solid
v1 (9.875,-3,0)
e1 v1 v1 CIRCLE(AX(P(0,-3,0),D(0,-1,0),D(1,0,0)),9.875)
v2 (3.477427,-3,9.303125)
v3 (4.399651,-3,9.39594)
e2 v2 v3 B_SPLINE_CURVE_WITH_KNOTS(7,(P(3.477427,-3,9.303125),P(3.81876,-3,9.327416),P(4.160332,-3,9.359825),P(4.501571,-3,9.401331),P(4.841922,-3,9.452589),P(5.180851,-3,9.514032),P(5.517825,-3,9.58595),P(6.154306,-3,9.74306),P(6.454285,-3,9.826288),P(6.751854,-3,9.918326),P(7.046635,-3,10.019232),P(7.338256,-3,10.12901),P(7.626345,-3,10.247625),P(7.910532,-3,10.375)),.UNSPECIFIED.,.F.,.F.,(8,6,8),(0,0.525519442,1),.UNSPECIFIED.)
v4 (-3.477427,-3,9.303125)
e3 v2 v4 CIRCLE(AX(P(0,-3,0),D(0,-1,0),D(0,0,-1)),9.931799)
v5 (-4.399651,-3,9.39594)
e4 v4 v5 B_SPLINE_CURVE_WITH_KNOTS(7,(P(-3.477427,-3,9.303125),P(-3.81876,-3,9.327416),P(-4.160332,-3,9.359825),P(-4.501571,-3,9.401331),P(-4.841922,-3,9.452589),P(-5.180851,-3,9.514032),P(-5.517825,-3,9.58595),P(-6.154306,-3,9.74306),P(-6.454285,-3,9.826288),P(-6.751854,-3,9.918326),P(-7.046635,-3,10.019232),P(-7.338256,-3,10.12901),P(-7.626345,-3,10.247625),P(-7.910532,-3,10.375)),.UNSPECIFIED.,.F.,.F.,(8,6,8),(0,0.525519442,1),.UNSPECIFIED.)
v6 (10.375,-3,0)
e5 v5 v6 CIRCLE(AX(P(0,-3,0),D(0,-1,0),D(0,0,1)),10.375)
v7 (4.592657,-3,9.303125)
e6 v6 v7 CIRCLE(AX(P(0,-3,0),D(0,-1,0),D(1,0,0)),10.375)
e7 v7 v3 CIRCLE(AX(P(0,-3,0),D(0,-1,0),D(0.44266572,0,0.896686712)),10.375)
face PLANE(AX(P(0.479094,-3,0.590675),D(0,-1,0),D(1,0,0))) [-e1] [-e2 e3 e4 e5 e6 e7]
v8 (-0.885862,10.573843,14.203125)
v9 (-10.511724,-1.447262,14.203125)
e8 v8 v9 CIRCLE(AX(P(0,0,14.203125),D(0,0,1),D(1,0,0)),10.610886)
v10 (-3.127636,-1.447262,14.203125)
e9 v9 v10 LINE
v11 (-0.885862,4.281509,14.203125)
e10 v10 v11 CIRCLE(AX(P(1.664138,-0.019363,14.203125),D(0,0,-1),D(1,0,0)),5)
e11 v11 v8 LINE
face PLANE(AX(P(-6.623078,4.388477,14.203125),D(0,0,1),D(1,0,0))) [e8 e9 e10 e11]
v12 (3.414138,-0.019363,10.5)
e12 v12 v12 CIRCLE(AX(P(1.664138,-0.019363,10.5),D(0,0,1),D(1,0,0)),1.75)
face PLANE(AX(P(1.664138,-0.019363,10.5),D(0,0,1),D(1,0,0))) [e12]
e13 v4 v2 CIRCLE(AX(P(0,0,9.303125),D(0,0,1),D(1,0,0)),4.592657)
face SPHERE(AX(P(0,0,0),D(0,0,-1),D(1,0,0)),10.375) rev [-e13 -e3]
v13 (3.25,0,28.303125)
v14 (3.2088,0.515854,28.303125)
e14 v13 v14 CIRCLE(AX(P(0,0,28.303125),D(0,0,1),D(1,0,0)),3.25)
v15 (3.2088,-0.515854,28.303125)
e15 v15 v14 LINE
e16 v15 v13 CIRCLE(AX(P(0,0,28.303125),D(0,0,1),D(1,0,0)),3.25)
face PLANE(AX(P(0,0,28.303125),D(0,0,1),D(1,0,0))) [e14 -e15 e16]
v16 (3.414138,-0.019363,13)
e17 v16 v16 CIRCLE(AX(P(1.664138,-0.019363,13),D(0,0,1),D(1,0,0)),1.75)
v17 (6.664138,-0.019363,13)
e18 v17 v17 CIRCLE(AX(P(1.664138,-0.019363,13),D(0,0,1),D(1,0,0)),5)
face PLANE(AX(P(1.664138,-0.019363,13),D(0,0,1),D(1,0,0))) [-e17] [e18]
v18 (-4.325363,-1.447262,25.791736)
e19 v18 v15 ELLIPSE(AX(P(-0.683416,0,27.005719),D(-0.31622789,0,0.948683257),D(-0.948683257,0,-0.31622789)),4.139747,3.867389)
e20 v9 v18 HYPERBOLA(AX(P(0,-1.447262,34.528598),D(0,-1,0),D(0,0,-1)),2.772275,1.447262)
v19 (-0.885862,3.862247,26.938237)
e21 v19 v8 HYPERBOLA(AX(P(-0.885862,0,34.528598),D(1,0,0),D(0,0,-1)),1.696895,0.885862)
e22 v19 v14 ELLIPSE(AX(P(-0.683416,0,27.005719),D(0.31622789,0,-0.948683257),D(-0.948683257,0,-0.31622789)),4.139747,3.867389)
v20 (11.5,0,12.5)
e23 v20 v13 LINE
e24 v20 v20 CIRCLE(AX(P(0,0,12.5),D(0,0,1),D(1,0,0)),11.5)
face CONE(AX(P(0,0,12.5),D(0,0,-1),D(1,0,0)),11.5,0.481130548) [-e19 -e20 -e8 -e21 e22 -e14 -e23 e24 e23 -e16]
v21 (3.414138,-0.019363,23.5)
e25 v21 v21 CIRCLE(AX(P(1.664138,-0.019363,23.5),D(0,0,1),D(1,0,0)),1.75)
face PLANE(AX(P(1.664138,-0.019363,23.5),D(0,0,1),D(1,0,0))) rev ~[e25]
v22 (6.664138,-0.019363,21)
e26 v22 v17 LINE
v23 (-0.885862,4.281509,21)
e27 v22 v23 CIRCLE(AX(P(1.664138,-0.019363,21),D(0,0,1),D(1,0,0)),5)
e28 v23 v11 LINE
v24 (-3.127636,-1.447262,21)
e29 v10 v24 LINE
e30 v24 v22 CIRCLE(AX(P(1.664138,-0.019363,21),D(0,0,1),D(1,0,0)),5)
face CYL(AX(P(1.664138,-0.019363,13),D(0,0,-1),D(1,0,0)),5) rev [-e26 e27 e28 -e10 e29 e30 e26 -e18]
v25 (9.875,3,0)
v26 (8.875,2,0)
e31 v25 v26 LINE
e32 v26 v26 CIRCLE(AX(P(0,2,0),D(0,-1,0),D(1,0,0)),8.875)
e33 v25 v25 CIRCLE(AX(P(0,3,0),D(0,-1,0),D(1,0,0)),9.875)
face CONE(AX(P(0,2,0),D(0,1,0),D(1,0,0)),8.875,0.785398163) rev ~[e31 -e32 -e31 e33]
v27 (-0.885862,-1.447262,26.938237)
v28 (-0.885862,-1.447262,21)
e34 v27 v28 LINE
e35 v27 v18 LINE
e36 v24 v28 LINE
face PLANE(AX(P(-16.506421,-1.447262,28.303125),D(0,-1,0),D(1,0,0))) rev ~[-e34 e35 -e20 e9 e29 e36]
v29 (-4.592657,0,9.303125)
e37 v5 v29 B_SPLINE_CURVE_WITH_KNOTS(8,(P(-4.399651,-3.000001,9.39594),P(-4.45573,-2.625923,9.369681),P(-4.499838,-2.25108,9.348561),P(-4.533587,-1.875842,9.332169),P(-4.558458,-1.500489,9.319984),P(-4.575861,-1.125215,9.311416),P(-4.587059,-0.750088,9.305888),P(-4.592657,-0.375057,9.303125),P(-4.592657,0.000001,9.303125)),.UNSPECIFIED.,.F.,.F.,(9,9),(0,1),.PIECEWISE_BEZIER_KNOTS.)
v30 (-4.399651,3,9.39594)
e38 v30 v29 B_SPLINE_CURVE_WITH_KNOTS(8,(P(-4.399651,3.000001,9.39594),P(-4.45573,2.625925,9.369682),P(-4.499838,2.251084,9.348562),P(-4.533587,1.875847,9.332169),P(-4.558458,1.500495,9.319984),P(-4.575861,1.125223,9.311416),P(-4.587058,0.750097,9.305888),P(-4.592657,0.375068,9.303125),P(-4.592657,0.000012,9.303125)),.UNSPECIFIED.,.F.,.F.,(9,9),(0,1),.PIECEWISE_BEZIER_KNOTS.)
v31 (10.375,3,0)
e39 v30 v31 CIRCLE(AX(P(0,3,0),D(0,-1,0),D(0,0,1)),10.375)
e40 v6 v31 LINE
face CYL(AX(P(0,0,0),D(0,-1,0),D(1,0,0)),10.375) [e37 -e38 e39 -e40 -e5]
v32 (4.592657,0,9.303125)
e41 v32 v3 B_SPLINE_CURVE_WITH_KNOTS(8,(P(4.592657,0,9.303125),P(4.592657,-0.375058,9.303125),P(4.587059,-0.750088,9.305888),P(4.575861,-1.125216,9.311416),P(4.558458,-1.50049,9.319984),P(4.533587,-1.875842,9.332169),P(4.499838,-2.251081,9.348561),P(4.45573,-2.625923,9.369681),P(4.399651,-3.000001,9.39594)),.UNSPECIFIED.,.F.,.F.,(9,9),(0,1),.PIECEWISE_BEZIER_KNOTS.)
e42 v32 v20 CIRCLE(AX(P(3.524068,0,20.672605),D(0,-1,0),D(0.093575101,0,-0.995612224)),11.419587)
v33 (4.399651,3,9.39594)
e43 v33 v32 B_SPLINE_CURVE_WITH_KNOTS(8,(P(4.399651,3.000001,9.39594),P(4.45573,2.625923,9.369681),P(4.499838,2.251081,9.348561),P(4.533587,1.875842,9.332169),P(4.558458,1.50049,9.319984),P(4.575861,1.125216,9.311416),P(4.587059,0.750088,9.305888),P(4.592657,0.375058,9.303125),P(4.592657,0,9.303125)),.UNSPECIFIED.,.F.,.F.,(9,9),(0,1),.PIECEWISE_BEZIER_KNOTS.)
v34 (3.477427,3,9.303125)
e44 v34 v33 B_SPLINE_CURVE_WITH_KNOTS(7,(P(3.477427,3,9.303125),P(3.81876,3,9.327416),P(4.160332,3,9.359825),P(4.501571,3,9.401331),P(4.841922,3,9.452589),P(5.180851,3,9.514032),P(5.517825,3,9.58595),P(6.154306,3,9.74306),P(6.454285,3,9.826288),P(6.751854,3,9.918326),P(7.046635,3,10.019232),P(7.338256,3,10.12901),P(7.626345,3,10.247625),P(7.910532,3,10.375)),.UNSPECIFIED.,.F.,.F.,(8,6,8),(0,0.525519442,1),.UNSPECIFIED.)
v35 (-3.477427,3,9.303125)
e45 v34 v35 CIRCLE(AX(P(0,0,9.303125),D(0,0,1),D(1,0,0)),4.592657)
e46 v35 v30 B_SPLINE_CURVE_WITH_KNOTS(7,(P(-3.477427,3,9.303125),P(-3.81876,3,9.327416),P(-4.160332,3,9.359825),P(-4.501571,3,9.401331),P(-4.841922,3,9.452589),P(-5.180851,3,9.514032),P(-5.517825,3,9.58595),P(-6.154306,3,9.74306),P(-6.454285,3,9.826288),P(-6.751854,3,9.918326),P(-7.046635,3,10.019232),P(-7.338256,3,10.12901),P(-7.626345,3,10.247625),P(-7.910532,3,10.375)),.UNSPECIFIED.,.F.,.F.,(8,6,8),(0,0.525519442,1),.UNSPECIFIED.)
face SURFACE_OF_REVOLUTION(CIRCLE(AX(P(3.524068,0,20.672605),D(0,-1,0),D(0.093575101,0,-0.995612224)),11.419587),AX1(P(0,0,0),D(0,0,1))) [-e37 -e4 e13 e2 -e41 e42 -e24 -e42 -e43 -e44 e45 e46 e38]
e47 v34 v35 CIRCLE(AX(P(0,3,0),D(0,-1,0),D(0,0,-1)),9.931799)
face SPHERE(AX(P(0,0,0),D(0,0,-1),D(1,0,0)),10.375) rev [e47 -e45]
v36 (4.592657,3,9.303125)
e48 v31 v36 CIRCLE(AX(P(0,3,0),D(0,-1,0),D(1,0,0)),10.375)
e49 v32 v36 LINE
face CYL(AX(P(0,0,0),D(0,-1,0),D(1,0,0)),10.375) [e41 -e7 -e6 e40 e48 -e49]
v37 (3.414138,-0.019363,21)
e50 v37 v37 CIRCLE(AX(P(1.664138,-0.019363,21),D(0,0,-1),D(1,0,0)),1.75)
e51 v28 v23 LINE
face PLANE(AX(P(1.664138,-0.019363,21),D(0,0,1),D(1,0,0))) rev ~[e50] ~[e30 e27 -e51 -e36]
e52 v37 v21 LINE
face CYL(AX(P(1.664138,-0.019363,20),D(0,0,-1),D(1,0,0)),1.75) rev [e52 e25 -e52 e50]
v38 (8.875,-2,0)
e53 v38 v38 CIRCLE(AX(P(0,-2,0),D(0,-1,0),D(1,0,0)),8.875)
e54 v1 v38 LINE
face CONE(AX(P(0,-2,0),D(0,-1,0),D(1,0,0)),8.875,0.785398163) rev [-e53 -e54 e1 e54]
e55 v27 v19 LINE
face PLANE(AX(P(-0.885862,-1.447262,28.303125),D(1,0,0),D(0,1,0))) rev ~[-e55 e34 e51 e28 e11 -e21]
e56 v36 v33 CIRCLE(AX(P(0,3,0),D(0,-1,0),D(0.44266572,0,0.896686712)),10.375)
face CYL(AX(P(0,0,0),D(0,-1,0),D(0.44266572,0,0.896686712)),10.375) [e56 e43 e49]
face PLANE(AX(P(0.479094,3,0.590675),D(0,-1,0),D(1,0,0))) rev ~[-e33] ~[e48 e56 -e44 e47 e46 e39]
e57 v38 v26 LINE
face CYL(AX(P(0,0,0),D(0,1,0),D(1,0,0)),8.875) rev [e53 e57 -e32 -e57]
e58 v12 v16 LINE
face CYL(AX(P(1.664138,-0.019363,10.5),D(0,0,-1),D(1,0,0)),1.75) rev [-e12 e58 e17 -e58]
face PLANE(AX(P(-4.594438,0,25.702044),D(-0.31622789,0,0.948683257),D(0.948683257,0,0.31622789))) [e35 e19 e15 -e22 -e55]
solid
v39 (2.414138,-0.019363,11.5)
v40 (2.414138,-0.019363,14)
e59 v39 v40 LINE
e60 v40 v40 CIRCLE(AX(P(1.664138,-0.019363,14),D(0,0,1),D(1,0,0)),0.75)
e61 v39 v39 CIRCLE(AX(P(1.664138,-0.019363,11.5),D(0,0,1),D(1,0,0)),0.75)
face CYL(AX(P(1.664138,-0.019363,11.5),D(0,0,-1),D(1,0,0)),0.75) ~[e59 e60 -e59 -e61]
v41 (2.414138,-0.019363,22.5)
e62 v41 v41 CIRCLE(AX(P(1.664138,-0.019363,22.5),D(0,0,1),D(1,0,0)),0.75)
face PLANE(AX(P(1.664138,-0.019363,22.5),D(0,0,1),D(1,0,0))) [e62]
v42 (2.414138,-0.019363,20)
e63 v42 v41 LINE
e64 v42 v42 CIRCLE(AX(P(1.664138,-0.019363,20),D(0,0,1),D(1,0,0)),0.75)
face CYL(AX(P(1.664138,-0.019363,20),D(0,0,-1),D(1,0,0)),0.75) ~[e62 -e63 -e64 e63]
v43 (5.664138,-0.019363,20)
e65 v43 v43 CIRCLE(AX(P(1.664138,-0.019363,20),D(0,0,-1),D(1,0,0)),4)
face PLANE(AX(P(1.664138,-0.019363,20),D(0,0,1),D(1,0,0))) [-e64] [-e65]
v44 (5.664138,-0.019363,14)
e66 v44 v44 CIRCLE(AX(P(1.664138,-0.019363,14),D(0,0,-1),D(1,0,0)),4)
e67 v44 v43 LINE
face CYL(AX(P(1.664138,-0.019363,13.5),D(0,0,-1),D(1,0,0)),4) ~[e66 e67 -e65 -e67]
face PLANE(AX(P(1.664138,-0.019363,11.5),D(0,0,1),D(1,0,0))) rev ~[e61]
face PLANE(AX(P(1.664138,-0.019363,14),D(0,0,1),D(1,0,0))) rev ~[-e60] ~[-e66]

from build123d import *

# Parameters (mm, degrees)
F0_R           = 8.875
F3_DEPTH       = 3
F3_DEPTH_BACK  = 3
F4_SIZE        = 1
F6_DEPTH       = 14.1
F8_START       = 13.5
F7_R           = 4
F7_R_2         = 1.75
F7_R_3         = 0.75
F8_DEPTH       = 6.5
F10_START      = 13
F7_R_4         = 5
F7_R_5         = 4.5
F10_DEPTH      = 8
F11_START      = 13
F11_DEPTH      = 1
F12_START      = 20
F12_DEPTH      = 1
F13_START      = 10.5
F13_DEPTH      = 2.5
F14_START      = 20
F14_DEPTH      = 3.5
F15_START      = 11.5
F15_DEPTH      = 2.5
F16_START      = 20
F16_DEPTH      = 2.5
F20_DEPTH      = 25
F20_DEPTH_BACK = 25


# Not quite as in the source:
# - a feature names something its author has since deleted; it is built from what else it names


with BuildPart() as f2:
    # F0 (on Front) → F2 (revolve)
    with BuildSketch(Plane.XZ):
        with BuildLine():
            ThreePointArc((0, 10.375), (2.3580401671, 10.1034781917), (4.5926568488, 9.3031246401))
            ThreePointArc((4.5926568488, 9.3031246401), (8.3205085843, 10.3091537222), (11.5, 12.5))
            Line((11.5, 12.5), (3.25, 28.3031246401))
            Line((3.25, 28.3031246401), (0, 28.3031246401))
            Line((0, 28.3031246401), (0, 10.375))
        make_face()
    revolve(axis=Axis((0, 0, 0), (0, 0, 1)))

    # F0 (on Front) → F3 (join, two sides)
    with BuildSketch(Plane.XZ) as f3_sk:
        with BuildLine():
            ThreePointArc((0, 10.375), (-7.3362328548, -7.3362328548), (10.375, 0))
            ThreePointArc((10.375, 0), (8.8116241354, 5.4768517505), (4.5926568488, 9.3031246401))
            Line((4.5926568488, 9.3031246401), (0, 9.3031246401))
            Line((0, 9.3031246401), (0, 10.375))
        make_face()
        Circle(F0_R, mode=Mode.SUBTRACT)
        with BuildLine():
            Line((0, 9.3031246401), (4.5926568488, 9.3031246401))
            ThreePointArc((4.5926568488, 9.3031246401), (2.3580401671, 10.1034781917), (0, 10.375))
            Line((0, 10.375), (0, 9.3031246401))
        make_face()
    extrude(amount=F3_DEPTH)
    extrude(f3_sk.sketch, amount=-F3_DEPTH_BACK)

    # F4
    f4_edges = [f2.edges().sort_by_distance(p)[0] for p in [
        (-8.875, -3, 0),
        (-8.875, 3, 0),
    ]]
    chamfer(f4_edges, length=F4_SIZE)

    # F5 (on face) → F6 (cut)
    with BuildSketch(Plane.XY.offset(28.3031246401)):
        with BuildLine():
            Line((-0.8858618094, 14.4863697807), (-16.5064213391, -1.4472623589))
            Line((-16.5064213391, -1.4472623589), (-2.9099710763, -1.4472623589))
            ThreePointArc((-2.9099710763, -1.4472623589), (-2.9720223474, 1.3151361779), (-0.8858618094, 3.1269392151))
            Line((-0.8858618094, 3.1269392151), (-0.8858618094, 14.4863697807))
        make_face()
        with BuildLine():
            ThreePointArc((-0.8858618094, 3.1269392151), (-2.9720223474, 1.3151361779), (-2.9099710763, -1.4472623589))
            Line((-2.9099710763, -1.4472623589), (-0.8858618094, -1.4472623589))
            Line((-0.8858618094, -1.4472623589), (-0.8858618094, 3.1269392151))
        make_face()
    extrude(amount=-F6_DEPTH, mode=Mode.SUBTRACT)

    # F7 (on Top) → F8 (join)
    with BuildSketch(Plane.XY.offset(F8_START)):
        with Locations((1.6641381906, -0.0193633477)):
            Circle(F7_R)
        with Locations((1.6641381906, -0.0193633477)):
            Circle(F7_R_2, mode=Mode.SUBTRACT)
        with Locations((1.6641381906, -0.0193633477)):
            Circle(F7_R_2)
        with Locations((1.6641381906, -0.0193633477)):
            Circle(F7_R_3, mode=Mode.SUBTRACT)
        with Locations((1.6641381906, -0.0193633477)):
            Circle(F7_R_3)
    extrude(amount=F8_DEPTH)

    # F7 (on Top) → F10 (cut)
    with BuildSketch(Plane.XY.offset(F10_START)):
        with Locations((1.6641381906, -0.0193633477)):
            Circle(F7_R_4)
        with Locations((1.6641381906, -0.0193633477)):
            Circle(F7_R_5, mode=Mode.SUBTRACT)
        with Locations((1.6641381906, -0.0193633477)):
            Circle(F7_R_5)
        with Locations((1.6641381906, -0.0193633477)):
            Circle(F7_R, mode=Mode.SUBTRACT)
    extrude(amount=F10_DEPTH, mode=Mode.SUBTRACT)

    # F7 (on Top) → F11 (cut)
    with BuildSketch(Plane.XY.offset(F11_START)):
        with Locations((1.6641381906, -0.0193633477)):
            Circle(F7_R_4)
        with Locations((1.6641381906, -0.0193633477)):
            Circle(F7_R_5, mode=Mode.SUBTRACT)
        with Locations((1.6641381906, -0.0193633477)):
            Circle(F7_R_5)
        with Locations((1.6641381906, -0.0193633477)):
            Circle(F7_R, mode=Mode.SUBTRACT)
        with Locations((1.6641381906, -0.0193633477)):
            Circle(F7_R)
        with Locations((1.6641381906, -0.0193633477)):
            Circle(F7_R_2, mode=Mode.SUBTRACT)
        with Locations((1.6641381906, -0.0193633477)):
            Circle(F7_R_2)
        with Locations((1.6641381906, -0.0193633477)):
            Circle(F7_R_3, mode=Mode.SUBTRACT)
        with Locations((1.6641381906, -0.0193633477)):
            Circle(F7_R_3)
    extrude(amount=F11_DEPTH, mode=Mode.SUBTRACT)

    # F7 (on Top) → F12 (cut)
    with BuildSketch(Plane.XY.offset(F12_START)):
        with Locations((1.6641381906, -0.0193633477)):
            Circle(F7_R_4)
        with Locations((1.6641381906, -0.0193633477)):
            Circle(F7_R_5, mode=Mode.SUBTRACT)
        with Locations((1.6641381906, -0.0193633477)):
            Circle(F7_R_5)
        with Locations((1.6641381906, -0.0193633477)):
            Circle(F7_R, mode=Mode.SUBTRACT)
        with Locations((1.6641381906, -0.0193633477)):
            Circle(F7_R)
        with Locations((1.6641381906, -0.0193633477)):
            Circle(F7_R_2, mode=Mode.SUBTRACT)
        with Locations((1.6641381906, -0.0193633477)):
            Circle(F7_R_2)
        with Locations((1.6641381906, -0.0193633477)):
            Circle(F7_R_3, mode=Mode.SUBTRACT)
        with Locations((1.6641381906, -0.0193633477)):
            Circle(F7_R_3)
    extrude(amount=F12_DEPTH, mode=Mode.SUBTRACT)

    # F7 (on Top) → F13 (cut)
    with BuildSketch(Plane.XY.offset(F13_START)):
        with Locations((1.6641381906, -0.0193633477)):
            Circle(F7_R_2)
        with Locations((1.6641381906, -0.0193633477)):
            Circle(F7_R_3, mode=Mode.SUBTRACT)
        with Locations((1.6641381906, -0.0193633477)):
            Circle(F7_R_3)
    extrude(amount=F13_DEPTH, mode=Mode.SUBTRACT)

    # F7 (on Top) → F14 (cut)
    with BuildSketch(Plane.XY.offset(F14_START)):
        with Locations((1.6641381906, -0.0193633477)):
            Circle(F7_R_2)
        with Locations((1.6641381906, -0.0193633477)):
            Circle(F7_R_3, mode=Mode.SUBTRACT)
        with Locations((1.6641381906, -0.0193633477)):
            Circle(F7_R_3)
    extrude(amount=F14_DEPTH, mode=Mode.SUBTRACT)

    # F7 (on Top) → F15 (join)
    with BuildSketch(Plane.XY.offset(F15_START)):
        with Locations((1.6641381906, -0.0193633477)):
            Circle(F7_R_3)
    extrude(amount=F15_DEPTH)

    # F7 (on Top) → F16 (join)
    with BuildSketch(Plane.XY.offset(F16_START)):
        with Locations((1.6641381906, -0.0193633477)):
            Circle(F7_R_3)
    extrude(amount=F16_DEPTH)

    # F19 (on Front) → F20 (cut, two sides)
    with BuildSketch(Plane.XZ) as f20_sk:
        Polygon((-4.3850070654, 28.8974568248), (-4.594437778, 25.7020443678), (4.991795402, 28.8974568248), align=None)
    extrude(amount=-F20_DEPTH, mode=Mode.SUBTRACT)
    extrude(f20_sk.sketch, amount=F20_DEPTH_BACK, mode=Mode.SUBTRACT)


solid = f2.part
